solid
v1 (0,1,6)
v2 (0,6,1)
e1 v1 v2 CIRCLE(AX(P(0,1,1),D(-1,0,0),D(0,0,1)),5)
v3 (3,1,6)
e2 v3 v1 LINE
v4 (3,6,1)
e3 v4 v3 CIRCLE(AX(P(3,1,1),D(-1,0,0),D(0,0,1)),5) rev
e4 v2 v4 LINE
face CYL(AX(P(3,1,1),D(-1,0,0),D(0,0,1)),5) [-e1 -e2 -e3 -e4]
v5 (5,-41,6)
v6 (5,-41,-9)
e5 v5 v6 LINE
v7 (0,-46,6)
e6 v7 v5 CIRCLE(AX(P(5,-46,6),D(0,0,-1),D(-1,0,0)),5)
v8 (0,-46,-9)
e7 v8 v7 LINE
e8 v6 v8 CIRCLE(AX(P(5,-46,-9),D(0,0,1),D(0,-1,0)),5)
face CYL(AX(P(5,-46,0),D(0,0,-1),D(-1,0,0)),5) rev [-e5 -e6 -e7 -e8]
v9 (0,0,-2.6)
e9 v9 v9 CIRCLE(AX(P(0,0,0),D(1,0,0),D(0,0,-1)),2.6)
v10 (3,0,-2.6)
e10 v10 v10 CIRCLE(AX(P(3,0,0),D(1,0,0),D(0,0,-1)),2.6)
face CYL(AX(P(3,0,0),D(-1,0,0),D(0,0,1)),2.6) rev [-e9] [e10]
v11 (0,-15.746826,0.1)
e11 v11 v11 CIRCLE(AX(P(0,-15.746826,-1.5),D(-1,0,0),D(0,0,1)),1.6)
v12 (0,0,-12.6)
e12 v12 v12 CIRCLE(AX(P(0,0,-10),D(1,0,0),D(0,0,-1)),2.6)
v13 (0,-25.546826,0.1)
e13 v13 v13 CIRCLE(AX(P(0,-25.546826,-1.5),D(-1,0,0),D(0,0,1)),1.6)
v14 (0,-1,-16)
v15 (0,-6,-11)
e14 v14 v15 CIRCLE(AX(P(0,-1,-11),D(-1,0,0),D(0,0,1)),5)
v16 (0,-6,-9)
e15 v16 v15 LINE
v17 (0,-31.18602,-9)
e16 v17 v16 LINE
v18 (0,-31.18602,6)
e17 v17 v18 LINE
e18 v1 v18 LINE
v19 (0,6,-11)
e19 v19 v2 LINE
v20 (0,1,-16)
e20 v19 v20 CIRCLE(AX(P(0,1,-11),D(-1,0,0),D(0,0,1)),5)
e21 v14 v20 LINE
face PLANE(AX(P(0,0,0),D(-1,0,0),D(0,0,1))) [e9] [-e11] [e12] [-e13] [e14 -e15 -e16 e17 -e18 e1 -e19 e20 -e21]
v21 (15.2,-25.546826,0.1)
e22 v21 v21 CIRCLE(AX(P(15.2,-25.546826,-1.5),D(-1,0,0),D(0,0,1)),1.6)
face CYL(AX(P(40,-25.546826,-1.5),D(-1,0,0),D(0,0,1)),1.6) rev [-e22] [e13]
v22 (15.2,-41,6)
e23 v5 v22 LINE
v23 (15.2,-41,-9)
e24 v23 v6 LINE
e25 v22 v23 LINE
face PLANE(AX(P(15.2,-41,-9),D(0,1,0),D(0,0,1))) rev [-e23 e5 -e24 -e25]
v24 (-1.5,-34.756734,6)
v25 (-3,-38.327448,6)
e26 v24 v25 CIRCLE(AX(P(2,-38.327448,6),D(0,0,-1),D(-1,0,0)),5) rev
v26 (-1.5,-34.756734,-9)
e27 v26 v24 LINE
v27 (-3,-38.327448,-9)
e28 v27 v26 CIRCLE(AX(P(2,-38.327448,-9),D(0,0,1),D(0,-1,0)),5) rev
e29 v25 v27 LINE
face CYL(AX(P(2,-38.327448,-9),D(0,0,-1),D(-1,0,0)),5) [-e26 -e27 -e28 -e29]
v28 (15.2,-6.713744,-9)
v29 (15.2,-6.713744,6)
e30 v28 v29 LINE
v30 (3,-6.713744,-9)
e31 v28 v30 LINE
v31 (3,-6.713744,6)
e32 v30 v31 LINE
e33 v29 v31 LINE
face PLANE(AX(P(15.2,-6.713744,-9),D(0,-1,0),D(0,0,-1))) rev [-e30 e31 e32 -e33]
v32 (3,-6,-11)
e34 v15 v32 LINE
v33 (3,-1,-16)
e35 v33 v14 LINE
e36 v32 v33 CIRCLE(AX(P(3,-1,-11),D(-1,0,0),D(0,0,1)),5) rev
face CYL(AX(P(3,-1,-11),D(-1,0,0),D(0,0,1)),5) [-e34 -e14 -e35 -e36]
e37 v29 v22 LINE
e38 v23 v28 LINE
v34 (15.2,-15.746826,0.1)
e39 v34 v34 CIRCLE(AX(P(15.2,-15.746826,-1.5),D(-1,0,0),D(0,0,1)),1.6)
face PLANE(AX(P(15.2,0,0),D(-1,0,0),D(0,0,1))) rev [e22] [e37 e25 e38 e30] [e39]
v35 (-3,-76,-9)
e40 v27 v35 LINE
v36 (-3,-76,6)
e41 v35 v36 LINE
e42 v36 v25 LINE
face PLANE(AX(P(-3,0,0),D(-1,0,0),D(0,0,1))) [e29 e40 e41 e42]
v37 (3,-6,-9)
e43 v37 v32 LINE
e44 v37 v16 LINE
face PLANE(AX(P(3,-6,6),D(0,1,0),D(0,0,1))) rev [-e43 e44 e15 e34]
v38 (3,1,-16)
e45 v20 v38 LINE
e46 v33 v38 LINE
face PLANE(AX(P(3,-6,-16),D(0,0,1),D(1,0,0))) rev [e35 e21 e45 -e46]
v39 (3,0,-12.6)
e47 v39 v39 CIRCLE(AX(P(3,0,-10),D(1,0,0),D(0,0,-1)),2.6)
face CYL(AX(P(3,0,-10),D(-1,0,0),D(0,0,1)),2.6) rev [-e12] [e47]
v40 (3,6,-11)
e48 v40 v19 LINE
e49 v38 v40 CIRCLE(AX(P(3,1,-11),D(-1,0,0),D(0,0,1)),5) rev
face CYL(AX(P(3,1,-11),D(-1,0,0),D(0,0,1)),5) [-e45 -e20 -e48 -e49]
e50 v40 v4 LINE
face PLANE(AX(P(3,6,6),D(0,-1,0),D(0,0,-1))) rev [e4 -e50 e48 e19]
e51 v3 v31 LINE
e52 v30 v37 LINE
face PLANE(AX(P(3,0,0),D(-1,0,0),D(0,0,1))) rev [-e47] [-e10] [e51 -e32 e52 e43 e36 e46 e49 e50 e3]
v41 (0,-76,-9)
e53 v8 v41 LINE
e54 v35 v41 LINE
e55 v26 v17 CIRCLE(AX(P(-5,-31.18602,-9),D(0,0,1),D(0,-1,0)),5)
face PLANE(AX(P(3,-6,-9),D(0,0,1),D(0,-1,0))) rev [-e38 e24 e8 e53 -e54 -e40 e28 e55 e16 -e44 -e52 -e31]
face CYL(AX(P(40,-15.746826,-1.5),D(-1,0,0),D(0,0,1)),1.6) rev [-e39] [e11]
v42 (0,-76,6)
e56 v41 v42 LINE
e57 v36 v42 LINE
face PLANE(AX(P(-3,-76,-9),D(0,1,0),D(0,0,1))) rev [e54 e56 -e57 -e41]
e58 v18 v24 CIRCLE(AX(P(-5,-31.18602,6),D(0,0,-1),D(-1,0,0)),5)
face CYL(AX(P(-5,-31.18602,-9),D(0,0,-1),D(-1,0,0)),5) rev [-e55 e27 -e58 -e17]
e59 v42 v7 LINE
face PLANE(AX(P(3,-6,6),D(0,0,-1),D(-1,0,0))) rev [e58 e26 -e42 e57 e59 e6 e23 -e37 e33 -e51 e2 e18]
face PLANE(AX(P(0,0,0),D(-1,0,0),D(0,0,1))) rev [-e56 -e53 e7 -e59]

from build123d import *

# Parameters (mm, degrees)
SKETCH1_W           = 22
SKETCH1_H           = 12
SKETCH1_R           = 2.6
BOSS_EXTRUDE1_DEPTH = 3
SKETCH2_W           = 15
SKETCH2_H           = 36
BOSS_EXTRUDE2_DEPTH = 3
FILLET1_R           = 5
FILLET2_R           = 1
SKETCH4_W           = 15
SKETCH4_H           = 34.286255804
BOSS_EXTRUDE3_DEPTH = 12.2
SKETCH9_R           = 1.6
CUT_EXTRUDE1_DEPTH  = 40
SKETCH12_W          = 15
SKETCH12_H          = 40.231404522
BOSS_EXTRUDE5_DEPTH = 3
FILLET3_R           = 5
FILLET4_R           = 5
SKETCH14_W          = 15
SKETCH14_H          = 1.024404938
CUT_EXTRUDE2_DEPTH  = 3
FILLET5_R           = 5


with BuildPart() as part:
    # Sketch1 → Boss-Extrude1 (new body)
    with BuildSketch(Plane(origin=(0, 0, 0), x_dir=(0, 0, -1), z_dir=(1, 0, 0))):
        with Locations((5, 0)):
            Rectangle(SKETCH1_W, SKETCH1_H)
        with Locations((10, 0)):
            Circle(SKETCH1_R, mode=Mode.SUBTRACT)
        Circle(SKETCH1_R, mode=Mode.SUBTRACT)
    extrude(amount=BOSS_EXTRUDE1_DEPTH)

    # Sketch2 → Boss-Extrude2 (add)
    with BuildSketch(Plane(origin=(0, 0, 0), x_dir=(0, 0, -1), z_dir=(1, 0, 0))):
        with Locations((1.5, -24)):
            Rectangle(SKETCH2_W, SKETCH2_H)
    extrude(amount=BOSS_EXTRUDE2_DEPTH)

    # Fillet1
    fillet1_edges = [part.edges().sort_by_distance(p)[0] for p in [
        (1.5, -6, -16),
        (1.5, 6, 6),
        (1.5, 6, -16),
    ]]
    fillet(fillet1_edges, radius=FILLET1_R)

    # Fillet2
    fillet2_edges = [part.edges().sort_by_distance(p)[0] for p in [
        (1.5, -42, 6),
        (1.5, -42, -9),
    ]]
    fillet(fillet2_edges, radius=FILLET2_R)

    # Sketch4 → Boss-Extrude3 (add)
    with BuildSketch(Plane(origin=(3, 0, 0), x_dir=(0, 0, -1), z_dir=(1, 0, 0))):
        with Locations((1.5, -23.856872098)):
            Rectangle(SKETCH4_W, SKETCH4_H)
    extrude(amount=BOSS_EXTRUDE3_DEPTH)

    # Sketch9 → Cut-Extrude1 (cut)
    with BuildSketch(Plane.ZY):
        with Locations((-1.5, -25.546825535)):
            Circle(SKETCH9_R)
        with Locations((-1.5, -15.746825535)):
            Circle(SKETCH9_R)
    extrude(amount=-CUT_EXTRUDE1_DEPTH, mode=Mode.SUBTRACT)

    # Sketch12 → Boss-Extrude5 (add)
    with BuildSketch(Plane.ZY):
        with Locations((-1.5, -55.884297739)):
            Rectangle(SKETCH12_W, SKETCH12_H)
    extrude(amount=BOSS_EXTRUDE5_DEPTH)

    # Fillet3
    # the kernel refuses this fillet: 5 mm, written as the material it adds along each edge
    with BuildSketch(Plane(origin=(0, -35.768595478, -9), x_dir=(0, 1, 0), z_dir=(0, 0, 1))) as fillet3_piece_1:
        with BuildLine():
            CenterArc((4.582575695, 5), FILLET3_R, 203.578178478, 66.421821522)
            Line((0, 3), (-0.091651514, 2.96))
            ThreePointArc((-0.091651514, 2.96), (-0.1, 1.5), (-0.1, 0))
            Line((-0.1, 0), (0, -0.1))
            Line((0, -0.1), (4.582575695, -0.1))
            Line((4.582575695, -0.1), (4.582575695, 0))
        make_face()
    extrude(amount=15)

    # Fillet4
    fillet4_edges = [part.edges().sort_by_distance(p)[0] for p in [
        (-3, -35.768595478, -1.5),
    ]]
    fillet(fillet4_edges, radius=FILLET4_R)

    # Sketch14 → Cut-Extrude2 (cut)
    with BuildSketch(Plane(origin=(3, 0, 0), x_dir=(0, 0, -1), z_dir=(1, 0, 0))):
        with Locations((1.5, -41.512202469)):
            Rectangle(SKETCH14_W, SKETCH14_H)
    extrude(amount=-CUT_EXTRUDE2_DEPTH, mode=Mode.SUBTRACT)

    # Fillet5
    fillet5_edges = [part.edges().sort_by_distance(p)[0] for p in [
        (0, -41, -1.5),
    ]]
    fillet(fillet5_edges, radius=FILLET5_R)


solid = part.part
